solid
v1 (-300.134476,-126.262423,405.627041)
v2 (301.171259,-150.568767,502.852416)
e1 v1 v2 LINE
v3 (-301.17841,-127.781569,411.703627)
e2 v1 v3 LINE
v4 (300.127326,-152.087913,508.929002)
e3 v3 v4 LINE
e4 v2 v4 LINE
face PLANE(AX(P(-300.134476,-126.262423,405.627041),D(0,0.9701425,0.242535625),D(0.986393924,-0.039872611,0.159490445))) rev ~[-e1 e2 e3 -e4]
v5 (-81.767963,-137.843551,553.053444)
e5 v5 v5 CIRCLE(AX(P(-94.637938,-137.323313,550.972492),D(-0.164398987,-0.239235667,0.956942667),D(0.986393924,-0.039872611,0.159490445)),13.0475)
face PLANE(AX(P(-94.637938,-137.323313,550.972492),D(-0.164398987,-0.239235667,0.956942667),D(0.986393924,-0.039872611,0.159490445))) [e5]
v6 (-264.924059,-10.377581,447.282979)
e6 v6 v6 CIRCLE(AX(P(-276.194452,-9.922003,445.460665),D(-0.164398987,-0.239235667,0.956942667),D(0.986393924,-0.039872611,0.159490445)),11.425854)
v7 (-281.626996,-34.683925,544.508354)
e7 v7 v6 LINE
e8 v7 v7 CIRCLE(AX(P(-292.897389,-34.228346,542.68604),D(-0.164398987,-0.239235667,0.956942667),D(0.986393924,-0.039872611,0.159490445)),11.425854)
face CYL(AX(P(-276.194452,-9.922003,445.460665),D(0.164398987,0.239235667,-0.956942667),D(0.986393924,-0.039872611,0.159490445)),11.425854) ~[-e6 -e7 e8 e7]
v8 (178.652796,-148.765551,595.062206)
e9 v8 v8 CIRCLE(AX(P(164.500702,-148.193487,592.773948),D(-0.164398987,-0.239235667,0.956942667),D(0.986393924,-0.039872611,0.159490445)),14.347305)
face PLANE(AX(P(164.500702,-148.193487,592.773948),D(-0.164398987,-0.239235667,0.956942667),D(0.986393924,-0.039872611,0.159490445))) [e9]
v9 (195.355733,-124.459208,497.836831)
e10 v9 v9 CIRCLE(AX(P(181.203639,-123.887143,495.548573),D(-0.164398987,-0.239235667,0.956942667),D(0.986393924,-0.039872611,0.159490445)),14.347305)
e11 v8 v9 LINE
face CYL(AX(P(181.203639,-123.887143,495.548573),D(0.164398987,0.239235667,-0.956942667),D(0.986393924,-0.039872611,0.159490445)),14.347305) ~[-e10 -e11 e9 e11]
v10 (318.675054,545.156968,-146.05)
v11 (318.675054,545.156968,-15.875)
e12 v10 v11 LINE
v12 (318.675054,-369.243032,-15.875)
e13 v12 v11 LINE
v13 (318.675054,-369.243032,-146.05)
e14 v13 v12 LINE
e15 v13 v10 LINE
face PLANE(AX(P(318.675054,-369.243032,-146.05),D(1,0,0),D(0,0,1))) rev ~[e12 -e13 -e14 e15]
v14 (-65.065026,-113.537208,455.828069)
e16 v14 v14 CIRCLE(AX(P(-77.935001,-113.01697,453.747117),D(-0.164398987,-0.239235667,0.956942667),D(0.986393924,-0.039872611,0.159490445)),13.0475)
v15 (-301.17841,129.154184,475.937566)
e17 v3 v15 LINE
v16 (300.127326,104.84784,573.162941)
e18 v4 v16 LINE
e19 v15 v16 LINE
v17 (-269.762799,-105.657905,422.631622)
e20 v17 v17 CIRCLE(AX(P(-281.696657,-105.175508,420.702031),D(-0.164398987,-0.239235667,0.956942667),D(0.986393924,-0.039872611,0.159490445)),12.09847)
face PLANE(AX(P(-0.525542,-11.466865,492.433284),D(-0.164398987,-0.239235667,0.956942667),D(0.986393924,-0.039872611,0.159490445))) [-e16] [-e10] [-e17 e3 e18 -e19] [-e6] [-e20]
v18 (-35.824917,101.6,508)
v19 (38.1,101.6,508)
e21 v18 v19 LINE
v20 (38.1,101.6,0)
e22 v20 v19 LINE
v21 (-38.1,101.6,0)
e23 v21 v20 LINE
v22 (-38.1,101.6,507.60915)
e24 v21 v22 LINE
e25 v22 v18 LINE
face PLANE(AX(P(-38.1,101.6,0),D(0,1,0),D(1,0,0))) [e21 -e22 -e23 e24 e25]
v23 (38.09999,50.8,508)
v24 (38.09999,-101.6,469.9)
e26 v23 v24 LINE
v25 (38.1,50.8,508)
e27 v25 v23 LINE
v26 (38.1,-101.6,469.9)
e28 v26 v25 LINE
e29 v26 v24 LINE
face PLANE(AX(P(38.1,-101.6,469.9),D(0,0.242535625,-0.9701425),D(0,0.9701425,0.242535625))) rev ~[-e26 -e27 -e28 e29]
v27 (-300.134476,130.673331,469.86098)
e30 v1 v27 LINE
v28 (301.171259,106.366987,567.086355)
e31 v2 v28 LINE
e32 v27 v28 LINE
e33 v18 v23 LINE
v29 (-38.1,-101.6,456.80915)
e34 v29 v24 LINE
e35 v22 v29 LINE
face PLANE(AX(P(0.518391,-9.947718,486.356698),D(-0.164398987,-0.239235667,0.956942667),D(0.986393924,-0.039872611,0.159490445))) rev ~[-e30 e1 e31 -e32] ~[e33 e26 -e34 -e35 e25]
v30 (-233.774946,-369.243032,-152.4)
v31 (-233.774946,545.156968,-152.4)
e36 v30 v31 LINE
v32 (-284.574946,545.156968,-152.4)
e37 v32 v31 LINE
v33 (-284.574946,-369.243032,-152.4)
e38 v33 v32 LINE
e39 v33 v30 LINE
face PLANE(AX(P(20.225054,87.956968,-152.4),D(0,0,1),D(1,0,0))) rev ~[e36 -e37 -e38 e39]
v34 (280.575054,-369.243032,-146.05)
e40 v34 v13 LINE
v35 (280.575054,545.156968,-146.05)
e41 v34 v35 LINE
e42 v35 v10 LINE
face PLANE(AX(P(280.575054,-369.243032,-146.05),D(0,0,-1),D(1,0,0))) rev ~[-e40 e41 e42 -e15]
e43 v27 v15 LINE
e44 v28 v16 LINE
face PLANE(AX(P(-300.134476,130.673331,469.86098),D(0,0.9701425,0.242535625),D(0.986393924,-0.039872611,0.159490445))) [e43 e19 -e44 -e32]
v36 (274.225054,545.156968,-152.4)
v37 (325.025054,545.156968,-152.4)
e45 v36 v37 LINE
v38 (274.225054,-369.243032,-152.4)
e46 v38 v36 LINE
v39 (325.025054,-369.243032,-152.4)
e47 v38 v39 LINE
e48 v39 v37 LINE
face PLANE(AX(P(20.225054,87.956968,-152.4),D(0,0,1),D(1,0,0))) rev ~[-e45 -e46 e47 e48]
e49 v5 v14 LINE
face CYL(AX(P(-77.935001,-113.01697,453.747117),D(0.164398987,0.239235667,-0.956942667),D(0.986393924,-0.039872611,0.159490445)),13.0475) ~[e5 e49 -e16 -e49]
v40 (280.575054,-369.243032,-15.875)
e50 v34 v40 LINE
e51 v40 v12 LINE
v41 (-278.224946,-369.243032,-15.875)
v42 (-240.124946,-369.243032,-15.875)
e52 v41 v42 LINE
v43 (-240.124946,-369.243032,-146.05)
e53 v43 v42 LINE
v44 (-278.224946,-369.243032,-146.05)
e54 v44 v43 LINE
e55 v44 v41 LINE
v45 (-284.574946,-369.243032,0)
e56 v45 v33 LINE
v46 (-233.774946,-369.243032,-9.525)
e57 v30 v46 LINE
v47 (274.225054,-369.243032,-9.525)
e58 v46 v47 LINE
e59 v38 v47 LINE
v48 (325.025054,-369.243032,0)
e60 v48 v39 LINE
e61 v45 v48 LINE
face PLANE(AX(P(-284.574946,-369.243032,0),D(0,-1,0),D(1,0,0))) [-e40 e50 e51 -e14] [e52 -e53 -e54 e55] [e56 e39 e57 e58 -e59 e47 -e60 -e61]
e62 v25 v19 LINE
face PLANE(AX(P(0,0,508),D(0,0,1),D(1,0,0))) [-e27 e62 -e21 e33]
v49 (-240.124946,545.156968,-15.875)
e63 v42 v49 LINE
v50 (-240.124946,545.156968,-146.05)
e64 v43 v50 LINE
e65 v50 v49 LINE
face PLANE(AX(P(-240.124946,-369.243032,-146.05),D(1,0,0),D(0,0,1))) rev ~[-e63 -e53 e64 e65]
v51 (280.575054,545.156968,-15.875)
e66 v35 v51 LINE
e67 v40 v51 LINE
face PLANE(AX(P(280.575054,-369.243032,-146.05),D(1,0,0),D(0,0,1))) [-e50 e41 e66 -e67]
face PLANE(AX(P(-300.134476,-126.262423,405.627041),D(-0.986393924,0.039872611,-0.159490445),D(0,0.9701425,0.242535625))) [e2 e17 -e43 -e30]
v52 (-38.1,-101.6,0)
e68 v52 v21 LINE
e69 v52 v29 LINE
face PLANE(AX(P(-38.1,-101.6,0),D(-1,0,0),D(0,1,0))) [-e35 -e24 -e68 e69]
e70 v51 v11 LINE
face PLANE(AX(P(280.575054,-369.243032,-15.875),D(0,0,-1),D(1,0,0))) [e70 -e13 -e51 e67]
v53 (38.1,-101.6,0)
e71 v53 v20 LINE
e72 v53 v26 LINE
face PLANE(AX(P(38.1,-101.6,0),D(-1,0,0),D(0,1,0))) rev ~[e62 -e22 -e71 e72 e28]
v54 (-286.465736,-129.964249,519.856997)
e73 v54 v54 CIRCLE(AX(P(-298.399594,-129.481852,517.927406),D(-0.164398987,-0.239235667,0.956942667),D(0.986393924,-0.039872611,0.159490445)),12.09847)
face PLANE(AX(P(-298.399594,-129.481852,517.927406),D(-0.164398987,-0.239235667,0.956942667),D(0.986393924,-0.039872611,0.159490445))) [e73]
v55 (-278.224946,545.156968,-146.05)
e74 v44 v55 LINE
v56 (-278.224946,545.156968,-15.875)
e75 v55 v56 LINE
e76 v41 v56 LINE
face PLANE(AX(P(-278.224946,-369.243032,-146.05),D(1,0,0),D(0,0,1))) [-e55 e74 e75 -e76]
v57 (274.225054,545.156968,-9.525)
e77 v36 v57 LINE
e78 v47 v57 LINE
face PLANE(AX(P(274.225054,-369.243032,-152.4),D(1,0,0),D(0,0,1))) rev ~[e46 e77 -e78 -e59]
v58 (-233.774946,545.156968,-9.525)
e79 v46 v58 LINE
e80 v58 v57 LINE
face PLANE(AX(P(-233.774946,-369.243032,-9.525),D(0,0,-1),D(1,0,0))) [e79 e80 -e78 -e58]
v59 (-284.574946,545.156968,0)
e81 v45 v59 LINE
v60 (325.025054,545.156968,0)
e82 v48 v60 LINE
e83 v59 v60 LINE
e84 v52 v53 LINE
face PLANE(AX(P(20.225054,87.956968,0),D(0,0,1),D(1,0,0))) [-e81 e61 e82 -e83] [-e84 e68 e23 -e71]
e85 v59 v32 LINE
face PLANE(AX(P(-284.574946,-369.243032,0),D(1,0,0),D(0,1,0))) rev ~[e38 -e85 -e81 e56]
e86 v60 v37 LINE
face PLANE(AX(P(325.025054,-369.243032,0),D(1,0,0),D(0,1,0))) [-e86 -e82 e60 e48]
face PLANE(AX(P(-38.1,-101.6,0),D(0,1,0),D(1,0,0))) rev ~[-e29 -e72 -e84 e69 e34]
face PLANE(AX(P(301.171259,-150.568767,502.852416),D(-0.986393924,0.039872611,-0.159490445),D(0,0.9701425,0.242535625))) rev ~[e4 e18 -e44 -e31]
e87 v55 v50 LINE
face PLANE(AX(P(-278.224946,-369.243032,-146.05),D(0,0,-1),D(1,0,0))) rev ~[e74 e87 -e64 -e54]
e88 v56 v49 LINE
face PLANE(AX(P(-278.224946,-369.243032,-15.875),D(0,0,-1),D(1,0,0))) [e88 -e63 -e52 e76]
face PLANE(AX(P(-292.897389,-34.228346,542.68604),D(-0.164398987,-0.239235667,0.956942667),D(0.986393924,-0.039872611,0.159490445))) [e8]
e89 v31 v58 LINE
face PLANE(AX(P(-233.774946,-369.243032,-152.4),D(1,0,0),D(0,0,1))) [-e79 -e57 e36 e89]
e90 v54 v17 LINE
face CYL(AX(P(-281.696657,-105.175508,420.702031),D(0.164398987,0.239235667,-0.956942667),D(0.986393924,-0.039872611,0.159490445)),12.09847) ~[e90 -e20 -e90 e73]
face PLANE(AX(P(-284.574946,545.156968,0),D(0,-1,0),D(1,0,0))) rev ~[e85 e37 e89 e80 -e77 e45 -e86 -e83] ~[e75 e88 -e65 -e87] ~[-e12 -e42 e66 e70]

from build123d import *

# Parameters (mm, degrees)
F0_W      = 609.6
F0_H      = 914.4
F1_DEPTH  = 152.4
F2_W      = 508
F2_H      = 142.875
F3_DEPTH  = 914.401
F4_W      = 76.2
F4_H      = 203.2
F5_DEPTH  = 508
F7_DEPTH  = 322.6759463469
F8_SIZE2  = 76.19999
F8_SIZE   = 12.69999
F9_W      = 609.6
F9_H      = 264.8433126191
F10_DEPTH = 6.35
F11_R     = 12.0984700112
F11_R_2   = 11.4258541902
F11_R_3   = 13.0475001639
F11_R_4   = 14.3473050844
F12_DEPTH = 101.6
F13_DEPTH = 25.4
F14_W     = 38.1
F14_H     = 130.175
F15_DEPTH = 914.401


# Not quite as in the source:
# - a fillet or chamfer is up to 0.001 mm smaller than in the source, because OpenCascade refuses the exact size


with BuildPart() as f1:
    # F0 (on Top) → F1 (new body)
    with BuildSketch(Plane.XY):
        with Locations((20.2250536531, 87.9569677773)):
            Rectangle(F0_W, F0_H)
    extrude(amount=-F1_DEPTH)

    # F2 (on face) → F3 (cut, through all)
    with BuildSketch(Plane.XZ.offset(369.2430322227)):
        with Locations((20.2250536531, -80.9625)):
            Rectangle(F2_W, F2_H)
    extrude(amount=-F3_DEPTH, mode=Mode.SUBTRACT)

    # F4 (on face) → F5 (join)
    with BuildSketch(Plane.XY):
        Rectangle(F4_W, F4_H)
    extrude(amount=F5_DEPTH)

    # F6 (on face) → F7 (cut, through all)
    with BuildSketch(Plane.YZ.offset(38.1)):
        Polygon((-101.6, 469.9), (50.8, 508), (-101.6, 508), align=None)
    extrude(amount=-F7_DEPTH, mode=Mode.SUBTRACT)

    # F8 (size 12.7 and 76.2 in the source; OpenCascade refuses exactly that, so slightly less here)
    f8_edges = [f1.edges().sort_by_distance(p)[0] for p in [
        (-38.1, -25.4, 488.95),
    ]]
    chamfer(f8_edges, length=F8_SIZE, length2=F8_SIZE2)

    # F9 (on face) → F10 (join)
    with BuildSketch(Plane(origin=(-76.8910670792, -111.8929380826, 447.5717523306), x_dir=(0.9863939238, -0.0398726111, 0.1594904446), z_dir=(-0.1643989873, -0.2392356668, 0.9569426674))):
        with Locations((78.4772256914, 108.3081216617)):
            Rectangle(F9_W, F9_H)
    extrude(amount=F10_DEPTH)

    # F11 (on face) → F12 (join)
    with BuildSketch(Plane(origin=(-77.9350006486, -113.4120845671, 453.6483382685), x_dir=(0.9863939238, -0.0398726111, 0.1594904446), z_dir=(-0.1643989873, -0.2392356668, 0.9569426674))):
        with Locations((-206.5722942352, 0)):
            Circle(F11_R)
        with Locations((-200.9941935539, 98.414324224)):
            Circle(F11_R_2)
        with Locations((0, 0.4072751035)):
            Circle(F11_R_3)
        with Locations((262.7131342888, 0)):
            Circle(F11_R_4)
    extrude(amount=F12_DEPTH)

    # F11 (on face) → F13 (join)
    with BuildSketch(Plane(origin=(-77.9350006486, -113.4120845671, 453.6483382685), x_dir=(0.9863939238, -0.0398726111, 0.1594904446), z_dir=(-0.1643989873, -0.2392356668, 0.9569426674))):
        with Locations((-206.5722942352, 0)):
            Circle(F11_R)
        with Locations((-200.9941935539, 98.414324224)):
            Circle(F11_R_2)
        with Locations((0, 0.4072751035)):
            Circle(F11_R_3)
        with Locations((262.7131342888, 0)):
            Circle(F11_R_4)
    extrude(amount=F13_DEPTH)

    # F14 (on face) → F15 (cut, through all)
    with BuildSketch(Plane.XZ.offset(369.2430322227)):
        with Locations((-259.1749463469, -80.9625)):
            Rectangle(F14_W, F14_H)
        with Locations((299.6250536531, -80.9625)):
            Rectangle(F14_W, F14_H)
    extrude(amount=-F15_DEPTH, mode=Mode.SUBTRACT)


solid = f1.part
